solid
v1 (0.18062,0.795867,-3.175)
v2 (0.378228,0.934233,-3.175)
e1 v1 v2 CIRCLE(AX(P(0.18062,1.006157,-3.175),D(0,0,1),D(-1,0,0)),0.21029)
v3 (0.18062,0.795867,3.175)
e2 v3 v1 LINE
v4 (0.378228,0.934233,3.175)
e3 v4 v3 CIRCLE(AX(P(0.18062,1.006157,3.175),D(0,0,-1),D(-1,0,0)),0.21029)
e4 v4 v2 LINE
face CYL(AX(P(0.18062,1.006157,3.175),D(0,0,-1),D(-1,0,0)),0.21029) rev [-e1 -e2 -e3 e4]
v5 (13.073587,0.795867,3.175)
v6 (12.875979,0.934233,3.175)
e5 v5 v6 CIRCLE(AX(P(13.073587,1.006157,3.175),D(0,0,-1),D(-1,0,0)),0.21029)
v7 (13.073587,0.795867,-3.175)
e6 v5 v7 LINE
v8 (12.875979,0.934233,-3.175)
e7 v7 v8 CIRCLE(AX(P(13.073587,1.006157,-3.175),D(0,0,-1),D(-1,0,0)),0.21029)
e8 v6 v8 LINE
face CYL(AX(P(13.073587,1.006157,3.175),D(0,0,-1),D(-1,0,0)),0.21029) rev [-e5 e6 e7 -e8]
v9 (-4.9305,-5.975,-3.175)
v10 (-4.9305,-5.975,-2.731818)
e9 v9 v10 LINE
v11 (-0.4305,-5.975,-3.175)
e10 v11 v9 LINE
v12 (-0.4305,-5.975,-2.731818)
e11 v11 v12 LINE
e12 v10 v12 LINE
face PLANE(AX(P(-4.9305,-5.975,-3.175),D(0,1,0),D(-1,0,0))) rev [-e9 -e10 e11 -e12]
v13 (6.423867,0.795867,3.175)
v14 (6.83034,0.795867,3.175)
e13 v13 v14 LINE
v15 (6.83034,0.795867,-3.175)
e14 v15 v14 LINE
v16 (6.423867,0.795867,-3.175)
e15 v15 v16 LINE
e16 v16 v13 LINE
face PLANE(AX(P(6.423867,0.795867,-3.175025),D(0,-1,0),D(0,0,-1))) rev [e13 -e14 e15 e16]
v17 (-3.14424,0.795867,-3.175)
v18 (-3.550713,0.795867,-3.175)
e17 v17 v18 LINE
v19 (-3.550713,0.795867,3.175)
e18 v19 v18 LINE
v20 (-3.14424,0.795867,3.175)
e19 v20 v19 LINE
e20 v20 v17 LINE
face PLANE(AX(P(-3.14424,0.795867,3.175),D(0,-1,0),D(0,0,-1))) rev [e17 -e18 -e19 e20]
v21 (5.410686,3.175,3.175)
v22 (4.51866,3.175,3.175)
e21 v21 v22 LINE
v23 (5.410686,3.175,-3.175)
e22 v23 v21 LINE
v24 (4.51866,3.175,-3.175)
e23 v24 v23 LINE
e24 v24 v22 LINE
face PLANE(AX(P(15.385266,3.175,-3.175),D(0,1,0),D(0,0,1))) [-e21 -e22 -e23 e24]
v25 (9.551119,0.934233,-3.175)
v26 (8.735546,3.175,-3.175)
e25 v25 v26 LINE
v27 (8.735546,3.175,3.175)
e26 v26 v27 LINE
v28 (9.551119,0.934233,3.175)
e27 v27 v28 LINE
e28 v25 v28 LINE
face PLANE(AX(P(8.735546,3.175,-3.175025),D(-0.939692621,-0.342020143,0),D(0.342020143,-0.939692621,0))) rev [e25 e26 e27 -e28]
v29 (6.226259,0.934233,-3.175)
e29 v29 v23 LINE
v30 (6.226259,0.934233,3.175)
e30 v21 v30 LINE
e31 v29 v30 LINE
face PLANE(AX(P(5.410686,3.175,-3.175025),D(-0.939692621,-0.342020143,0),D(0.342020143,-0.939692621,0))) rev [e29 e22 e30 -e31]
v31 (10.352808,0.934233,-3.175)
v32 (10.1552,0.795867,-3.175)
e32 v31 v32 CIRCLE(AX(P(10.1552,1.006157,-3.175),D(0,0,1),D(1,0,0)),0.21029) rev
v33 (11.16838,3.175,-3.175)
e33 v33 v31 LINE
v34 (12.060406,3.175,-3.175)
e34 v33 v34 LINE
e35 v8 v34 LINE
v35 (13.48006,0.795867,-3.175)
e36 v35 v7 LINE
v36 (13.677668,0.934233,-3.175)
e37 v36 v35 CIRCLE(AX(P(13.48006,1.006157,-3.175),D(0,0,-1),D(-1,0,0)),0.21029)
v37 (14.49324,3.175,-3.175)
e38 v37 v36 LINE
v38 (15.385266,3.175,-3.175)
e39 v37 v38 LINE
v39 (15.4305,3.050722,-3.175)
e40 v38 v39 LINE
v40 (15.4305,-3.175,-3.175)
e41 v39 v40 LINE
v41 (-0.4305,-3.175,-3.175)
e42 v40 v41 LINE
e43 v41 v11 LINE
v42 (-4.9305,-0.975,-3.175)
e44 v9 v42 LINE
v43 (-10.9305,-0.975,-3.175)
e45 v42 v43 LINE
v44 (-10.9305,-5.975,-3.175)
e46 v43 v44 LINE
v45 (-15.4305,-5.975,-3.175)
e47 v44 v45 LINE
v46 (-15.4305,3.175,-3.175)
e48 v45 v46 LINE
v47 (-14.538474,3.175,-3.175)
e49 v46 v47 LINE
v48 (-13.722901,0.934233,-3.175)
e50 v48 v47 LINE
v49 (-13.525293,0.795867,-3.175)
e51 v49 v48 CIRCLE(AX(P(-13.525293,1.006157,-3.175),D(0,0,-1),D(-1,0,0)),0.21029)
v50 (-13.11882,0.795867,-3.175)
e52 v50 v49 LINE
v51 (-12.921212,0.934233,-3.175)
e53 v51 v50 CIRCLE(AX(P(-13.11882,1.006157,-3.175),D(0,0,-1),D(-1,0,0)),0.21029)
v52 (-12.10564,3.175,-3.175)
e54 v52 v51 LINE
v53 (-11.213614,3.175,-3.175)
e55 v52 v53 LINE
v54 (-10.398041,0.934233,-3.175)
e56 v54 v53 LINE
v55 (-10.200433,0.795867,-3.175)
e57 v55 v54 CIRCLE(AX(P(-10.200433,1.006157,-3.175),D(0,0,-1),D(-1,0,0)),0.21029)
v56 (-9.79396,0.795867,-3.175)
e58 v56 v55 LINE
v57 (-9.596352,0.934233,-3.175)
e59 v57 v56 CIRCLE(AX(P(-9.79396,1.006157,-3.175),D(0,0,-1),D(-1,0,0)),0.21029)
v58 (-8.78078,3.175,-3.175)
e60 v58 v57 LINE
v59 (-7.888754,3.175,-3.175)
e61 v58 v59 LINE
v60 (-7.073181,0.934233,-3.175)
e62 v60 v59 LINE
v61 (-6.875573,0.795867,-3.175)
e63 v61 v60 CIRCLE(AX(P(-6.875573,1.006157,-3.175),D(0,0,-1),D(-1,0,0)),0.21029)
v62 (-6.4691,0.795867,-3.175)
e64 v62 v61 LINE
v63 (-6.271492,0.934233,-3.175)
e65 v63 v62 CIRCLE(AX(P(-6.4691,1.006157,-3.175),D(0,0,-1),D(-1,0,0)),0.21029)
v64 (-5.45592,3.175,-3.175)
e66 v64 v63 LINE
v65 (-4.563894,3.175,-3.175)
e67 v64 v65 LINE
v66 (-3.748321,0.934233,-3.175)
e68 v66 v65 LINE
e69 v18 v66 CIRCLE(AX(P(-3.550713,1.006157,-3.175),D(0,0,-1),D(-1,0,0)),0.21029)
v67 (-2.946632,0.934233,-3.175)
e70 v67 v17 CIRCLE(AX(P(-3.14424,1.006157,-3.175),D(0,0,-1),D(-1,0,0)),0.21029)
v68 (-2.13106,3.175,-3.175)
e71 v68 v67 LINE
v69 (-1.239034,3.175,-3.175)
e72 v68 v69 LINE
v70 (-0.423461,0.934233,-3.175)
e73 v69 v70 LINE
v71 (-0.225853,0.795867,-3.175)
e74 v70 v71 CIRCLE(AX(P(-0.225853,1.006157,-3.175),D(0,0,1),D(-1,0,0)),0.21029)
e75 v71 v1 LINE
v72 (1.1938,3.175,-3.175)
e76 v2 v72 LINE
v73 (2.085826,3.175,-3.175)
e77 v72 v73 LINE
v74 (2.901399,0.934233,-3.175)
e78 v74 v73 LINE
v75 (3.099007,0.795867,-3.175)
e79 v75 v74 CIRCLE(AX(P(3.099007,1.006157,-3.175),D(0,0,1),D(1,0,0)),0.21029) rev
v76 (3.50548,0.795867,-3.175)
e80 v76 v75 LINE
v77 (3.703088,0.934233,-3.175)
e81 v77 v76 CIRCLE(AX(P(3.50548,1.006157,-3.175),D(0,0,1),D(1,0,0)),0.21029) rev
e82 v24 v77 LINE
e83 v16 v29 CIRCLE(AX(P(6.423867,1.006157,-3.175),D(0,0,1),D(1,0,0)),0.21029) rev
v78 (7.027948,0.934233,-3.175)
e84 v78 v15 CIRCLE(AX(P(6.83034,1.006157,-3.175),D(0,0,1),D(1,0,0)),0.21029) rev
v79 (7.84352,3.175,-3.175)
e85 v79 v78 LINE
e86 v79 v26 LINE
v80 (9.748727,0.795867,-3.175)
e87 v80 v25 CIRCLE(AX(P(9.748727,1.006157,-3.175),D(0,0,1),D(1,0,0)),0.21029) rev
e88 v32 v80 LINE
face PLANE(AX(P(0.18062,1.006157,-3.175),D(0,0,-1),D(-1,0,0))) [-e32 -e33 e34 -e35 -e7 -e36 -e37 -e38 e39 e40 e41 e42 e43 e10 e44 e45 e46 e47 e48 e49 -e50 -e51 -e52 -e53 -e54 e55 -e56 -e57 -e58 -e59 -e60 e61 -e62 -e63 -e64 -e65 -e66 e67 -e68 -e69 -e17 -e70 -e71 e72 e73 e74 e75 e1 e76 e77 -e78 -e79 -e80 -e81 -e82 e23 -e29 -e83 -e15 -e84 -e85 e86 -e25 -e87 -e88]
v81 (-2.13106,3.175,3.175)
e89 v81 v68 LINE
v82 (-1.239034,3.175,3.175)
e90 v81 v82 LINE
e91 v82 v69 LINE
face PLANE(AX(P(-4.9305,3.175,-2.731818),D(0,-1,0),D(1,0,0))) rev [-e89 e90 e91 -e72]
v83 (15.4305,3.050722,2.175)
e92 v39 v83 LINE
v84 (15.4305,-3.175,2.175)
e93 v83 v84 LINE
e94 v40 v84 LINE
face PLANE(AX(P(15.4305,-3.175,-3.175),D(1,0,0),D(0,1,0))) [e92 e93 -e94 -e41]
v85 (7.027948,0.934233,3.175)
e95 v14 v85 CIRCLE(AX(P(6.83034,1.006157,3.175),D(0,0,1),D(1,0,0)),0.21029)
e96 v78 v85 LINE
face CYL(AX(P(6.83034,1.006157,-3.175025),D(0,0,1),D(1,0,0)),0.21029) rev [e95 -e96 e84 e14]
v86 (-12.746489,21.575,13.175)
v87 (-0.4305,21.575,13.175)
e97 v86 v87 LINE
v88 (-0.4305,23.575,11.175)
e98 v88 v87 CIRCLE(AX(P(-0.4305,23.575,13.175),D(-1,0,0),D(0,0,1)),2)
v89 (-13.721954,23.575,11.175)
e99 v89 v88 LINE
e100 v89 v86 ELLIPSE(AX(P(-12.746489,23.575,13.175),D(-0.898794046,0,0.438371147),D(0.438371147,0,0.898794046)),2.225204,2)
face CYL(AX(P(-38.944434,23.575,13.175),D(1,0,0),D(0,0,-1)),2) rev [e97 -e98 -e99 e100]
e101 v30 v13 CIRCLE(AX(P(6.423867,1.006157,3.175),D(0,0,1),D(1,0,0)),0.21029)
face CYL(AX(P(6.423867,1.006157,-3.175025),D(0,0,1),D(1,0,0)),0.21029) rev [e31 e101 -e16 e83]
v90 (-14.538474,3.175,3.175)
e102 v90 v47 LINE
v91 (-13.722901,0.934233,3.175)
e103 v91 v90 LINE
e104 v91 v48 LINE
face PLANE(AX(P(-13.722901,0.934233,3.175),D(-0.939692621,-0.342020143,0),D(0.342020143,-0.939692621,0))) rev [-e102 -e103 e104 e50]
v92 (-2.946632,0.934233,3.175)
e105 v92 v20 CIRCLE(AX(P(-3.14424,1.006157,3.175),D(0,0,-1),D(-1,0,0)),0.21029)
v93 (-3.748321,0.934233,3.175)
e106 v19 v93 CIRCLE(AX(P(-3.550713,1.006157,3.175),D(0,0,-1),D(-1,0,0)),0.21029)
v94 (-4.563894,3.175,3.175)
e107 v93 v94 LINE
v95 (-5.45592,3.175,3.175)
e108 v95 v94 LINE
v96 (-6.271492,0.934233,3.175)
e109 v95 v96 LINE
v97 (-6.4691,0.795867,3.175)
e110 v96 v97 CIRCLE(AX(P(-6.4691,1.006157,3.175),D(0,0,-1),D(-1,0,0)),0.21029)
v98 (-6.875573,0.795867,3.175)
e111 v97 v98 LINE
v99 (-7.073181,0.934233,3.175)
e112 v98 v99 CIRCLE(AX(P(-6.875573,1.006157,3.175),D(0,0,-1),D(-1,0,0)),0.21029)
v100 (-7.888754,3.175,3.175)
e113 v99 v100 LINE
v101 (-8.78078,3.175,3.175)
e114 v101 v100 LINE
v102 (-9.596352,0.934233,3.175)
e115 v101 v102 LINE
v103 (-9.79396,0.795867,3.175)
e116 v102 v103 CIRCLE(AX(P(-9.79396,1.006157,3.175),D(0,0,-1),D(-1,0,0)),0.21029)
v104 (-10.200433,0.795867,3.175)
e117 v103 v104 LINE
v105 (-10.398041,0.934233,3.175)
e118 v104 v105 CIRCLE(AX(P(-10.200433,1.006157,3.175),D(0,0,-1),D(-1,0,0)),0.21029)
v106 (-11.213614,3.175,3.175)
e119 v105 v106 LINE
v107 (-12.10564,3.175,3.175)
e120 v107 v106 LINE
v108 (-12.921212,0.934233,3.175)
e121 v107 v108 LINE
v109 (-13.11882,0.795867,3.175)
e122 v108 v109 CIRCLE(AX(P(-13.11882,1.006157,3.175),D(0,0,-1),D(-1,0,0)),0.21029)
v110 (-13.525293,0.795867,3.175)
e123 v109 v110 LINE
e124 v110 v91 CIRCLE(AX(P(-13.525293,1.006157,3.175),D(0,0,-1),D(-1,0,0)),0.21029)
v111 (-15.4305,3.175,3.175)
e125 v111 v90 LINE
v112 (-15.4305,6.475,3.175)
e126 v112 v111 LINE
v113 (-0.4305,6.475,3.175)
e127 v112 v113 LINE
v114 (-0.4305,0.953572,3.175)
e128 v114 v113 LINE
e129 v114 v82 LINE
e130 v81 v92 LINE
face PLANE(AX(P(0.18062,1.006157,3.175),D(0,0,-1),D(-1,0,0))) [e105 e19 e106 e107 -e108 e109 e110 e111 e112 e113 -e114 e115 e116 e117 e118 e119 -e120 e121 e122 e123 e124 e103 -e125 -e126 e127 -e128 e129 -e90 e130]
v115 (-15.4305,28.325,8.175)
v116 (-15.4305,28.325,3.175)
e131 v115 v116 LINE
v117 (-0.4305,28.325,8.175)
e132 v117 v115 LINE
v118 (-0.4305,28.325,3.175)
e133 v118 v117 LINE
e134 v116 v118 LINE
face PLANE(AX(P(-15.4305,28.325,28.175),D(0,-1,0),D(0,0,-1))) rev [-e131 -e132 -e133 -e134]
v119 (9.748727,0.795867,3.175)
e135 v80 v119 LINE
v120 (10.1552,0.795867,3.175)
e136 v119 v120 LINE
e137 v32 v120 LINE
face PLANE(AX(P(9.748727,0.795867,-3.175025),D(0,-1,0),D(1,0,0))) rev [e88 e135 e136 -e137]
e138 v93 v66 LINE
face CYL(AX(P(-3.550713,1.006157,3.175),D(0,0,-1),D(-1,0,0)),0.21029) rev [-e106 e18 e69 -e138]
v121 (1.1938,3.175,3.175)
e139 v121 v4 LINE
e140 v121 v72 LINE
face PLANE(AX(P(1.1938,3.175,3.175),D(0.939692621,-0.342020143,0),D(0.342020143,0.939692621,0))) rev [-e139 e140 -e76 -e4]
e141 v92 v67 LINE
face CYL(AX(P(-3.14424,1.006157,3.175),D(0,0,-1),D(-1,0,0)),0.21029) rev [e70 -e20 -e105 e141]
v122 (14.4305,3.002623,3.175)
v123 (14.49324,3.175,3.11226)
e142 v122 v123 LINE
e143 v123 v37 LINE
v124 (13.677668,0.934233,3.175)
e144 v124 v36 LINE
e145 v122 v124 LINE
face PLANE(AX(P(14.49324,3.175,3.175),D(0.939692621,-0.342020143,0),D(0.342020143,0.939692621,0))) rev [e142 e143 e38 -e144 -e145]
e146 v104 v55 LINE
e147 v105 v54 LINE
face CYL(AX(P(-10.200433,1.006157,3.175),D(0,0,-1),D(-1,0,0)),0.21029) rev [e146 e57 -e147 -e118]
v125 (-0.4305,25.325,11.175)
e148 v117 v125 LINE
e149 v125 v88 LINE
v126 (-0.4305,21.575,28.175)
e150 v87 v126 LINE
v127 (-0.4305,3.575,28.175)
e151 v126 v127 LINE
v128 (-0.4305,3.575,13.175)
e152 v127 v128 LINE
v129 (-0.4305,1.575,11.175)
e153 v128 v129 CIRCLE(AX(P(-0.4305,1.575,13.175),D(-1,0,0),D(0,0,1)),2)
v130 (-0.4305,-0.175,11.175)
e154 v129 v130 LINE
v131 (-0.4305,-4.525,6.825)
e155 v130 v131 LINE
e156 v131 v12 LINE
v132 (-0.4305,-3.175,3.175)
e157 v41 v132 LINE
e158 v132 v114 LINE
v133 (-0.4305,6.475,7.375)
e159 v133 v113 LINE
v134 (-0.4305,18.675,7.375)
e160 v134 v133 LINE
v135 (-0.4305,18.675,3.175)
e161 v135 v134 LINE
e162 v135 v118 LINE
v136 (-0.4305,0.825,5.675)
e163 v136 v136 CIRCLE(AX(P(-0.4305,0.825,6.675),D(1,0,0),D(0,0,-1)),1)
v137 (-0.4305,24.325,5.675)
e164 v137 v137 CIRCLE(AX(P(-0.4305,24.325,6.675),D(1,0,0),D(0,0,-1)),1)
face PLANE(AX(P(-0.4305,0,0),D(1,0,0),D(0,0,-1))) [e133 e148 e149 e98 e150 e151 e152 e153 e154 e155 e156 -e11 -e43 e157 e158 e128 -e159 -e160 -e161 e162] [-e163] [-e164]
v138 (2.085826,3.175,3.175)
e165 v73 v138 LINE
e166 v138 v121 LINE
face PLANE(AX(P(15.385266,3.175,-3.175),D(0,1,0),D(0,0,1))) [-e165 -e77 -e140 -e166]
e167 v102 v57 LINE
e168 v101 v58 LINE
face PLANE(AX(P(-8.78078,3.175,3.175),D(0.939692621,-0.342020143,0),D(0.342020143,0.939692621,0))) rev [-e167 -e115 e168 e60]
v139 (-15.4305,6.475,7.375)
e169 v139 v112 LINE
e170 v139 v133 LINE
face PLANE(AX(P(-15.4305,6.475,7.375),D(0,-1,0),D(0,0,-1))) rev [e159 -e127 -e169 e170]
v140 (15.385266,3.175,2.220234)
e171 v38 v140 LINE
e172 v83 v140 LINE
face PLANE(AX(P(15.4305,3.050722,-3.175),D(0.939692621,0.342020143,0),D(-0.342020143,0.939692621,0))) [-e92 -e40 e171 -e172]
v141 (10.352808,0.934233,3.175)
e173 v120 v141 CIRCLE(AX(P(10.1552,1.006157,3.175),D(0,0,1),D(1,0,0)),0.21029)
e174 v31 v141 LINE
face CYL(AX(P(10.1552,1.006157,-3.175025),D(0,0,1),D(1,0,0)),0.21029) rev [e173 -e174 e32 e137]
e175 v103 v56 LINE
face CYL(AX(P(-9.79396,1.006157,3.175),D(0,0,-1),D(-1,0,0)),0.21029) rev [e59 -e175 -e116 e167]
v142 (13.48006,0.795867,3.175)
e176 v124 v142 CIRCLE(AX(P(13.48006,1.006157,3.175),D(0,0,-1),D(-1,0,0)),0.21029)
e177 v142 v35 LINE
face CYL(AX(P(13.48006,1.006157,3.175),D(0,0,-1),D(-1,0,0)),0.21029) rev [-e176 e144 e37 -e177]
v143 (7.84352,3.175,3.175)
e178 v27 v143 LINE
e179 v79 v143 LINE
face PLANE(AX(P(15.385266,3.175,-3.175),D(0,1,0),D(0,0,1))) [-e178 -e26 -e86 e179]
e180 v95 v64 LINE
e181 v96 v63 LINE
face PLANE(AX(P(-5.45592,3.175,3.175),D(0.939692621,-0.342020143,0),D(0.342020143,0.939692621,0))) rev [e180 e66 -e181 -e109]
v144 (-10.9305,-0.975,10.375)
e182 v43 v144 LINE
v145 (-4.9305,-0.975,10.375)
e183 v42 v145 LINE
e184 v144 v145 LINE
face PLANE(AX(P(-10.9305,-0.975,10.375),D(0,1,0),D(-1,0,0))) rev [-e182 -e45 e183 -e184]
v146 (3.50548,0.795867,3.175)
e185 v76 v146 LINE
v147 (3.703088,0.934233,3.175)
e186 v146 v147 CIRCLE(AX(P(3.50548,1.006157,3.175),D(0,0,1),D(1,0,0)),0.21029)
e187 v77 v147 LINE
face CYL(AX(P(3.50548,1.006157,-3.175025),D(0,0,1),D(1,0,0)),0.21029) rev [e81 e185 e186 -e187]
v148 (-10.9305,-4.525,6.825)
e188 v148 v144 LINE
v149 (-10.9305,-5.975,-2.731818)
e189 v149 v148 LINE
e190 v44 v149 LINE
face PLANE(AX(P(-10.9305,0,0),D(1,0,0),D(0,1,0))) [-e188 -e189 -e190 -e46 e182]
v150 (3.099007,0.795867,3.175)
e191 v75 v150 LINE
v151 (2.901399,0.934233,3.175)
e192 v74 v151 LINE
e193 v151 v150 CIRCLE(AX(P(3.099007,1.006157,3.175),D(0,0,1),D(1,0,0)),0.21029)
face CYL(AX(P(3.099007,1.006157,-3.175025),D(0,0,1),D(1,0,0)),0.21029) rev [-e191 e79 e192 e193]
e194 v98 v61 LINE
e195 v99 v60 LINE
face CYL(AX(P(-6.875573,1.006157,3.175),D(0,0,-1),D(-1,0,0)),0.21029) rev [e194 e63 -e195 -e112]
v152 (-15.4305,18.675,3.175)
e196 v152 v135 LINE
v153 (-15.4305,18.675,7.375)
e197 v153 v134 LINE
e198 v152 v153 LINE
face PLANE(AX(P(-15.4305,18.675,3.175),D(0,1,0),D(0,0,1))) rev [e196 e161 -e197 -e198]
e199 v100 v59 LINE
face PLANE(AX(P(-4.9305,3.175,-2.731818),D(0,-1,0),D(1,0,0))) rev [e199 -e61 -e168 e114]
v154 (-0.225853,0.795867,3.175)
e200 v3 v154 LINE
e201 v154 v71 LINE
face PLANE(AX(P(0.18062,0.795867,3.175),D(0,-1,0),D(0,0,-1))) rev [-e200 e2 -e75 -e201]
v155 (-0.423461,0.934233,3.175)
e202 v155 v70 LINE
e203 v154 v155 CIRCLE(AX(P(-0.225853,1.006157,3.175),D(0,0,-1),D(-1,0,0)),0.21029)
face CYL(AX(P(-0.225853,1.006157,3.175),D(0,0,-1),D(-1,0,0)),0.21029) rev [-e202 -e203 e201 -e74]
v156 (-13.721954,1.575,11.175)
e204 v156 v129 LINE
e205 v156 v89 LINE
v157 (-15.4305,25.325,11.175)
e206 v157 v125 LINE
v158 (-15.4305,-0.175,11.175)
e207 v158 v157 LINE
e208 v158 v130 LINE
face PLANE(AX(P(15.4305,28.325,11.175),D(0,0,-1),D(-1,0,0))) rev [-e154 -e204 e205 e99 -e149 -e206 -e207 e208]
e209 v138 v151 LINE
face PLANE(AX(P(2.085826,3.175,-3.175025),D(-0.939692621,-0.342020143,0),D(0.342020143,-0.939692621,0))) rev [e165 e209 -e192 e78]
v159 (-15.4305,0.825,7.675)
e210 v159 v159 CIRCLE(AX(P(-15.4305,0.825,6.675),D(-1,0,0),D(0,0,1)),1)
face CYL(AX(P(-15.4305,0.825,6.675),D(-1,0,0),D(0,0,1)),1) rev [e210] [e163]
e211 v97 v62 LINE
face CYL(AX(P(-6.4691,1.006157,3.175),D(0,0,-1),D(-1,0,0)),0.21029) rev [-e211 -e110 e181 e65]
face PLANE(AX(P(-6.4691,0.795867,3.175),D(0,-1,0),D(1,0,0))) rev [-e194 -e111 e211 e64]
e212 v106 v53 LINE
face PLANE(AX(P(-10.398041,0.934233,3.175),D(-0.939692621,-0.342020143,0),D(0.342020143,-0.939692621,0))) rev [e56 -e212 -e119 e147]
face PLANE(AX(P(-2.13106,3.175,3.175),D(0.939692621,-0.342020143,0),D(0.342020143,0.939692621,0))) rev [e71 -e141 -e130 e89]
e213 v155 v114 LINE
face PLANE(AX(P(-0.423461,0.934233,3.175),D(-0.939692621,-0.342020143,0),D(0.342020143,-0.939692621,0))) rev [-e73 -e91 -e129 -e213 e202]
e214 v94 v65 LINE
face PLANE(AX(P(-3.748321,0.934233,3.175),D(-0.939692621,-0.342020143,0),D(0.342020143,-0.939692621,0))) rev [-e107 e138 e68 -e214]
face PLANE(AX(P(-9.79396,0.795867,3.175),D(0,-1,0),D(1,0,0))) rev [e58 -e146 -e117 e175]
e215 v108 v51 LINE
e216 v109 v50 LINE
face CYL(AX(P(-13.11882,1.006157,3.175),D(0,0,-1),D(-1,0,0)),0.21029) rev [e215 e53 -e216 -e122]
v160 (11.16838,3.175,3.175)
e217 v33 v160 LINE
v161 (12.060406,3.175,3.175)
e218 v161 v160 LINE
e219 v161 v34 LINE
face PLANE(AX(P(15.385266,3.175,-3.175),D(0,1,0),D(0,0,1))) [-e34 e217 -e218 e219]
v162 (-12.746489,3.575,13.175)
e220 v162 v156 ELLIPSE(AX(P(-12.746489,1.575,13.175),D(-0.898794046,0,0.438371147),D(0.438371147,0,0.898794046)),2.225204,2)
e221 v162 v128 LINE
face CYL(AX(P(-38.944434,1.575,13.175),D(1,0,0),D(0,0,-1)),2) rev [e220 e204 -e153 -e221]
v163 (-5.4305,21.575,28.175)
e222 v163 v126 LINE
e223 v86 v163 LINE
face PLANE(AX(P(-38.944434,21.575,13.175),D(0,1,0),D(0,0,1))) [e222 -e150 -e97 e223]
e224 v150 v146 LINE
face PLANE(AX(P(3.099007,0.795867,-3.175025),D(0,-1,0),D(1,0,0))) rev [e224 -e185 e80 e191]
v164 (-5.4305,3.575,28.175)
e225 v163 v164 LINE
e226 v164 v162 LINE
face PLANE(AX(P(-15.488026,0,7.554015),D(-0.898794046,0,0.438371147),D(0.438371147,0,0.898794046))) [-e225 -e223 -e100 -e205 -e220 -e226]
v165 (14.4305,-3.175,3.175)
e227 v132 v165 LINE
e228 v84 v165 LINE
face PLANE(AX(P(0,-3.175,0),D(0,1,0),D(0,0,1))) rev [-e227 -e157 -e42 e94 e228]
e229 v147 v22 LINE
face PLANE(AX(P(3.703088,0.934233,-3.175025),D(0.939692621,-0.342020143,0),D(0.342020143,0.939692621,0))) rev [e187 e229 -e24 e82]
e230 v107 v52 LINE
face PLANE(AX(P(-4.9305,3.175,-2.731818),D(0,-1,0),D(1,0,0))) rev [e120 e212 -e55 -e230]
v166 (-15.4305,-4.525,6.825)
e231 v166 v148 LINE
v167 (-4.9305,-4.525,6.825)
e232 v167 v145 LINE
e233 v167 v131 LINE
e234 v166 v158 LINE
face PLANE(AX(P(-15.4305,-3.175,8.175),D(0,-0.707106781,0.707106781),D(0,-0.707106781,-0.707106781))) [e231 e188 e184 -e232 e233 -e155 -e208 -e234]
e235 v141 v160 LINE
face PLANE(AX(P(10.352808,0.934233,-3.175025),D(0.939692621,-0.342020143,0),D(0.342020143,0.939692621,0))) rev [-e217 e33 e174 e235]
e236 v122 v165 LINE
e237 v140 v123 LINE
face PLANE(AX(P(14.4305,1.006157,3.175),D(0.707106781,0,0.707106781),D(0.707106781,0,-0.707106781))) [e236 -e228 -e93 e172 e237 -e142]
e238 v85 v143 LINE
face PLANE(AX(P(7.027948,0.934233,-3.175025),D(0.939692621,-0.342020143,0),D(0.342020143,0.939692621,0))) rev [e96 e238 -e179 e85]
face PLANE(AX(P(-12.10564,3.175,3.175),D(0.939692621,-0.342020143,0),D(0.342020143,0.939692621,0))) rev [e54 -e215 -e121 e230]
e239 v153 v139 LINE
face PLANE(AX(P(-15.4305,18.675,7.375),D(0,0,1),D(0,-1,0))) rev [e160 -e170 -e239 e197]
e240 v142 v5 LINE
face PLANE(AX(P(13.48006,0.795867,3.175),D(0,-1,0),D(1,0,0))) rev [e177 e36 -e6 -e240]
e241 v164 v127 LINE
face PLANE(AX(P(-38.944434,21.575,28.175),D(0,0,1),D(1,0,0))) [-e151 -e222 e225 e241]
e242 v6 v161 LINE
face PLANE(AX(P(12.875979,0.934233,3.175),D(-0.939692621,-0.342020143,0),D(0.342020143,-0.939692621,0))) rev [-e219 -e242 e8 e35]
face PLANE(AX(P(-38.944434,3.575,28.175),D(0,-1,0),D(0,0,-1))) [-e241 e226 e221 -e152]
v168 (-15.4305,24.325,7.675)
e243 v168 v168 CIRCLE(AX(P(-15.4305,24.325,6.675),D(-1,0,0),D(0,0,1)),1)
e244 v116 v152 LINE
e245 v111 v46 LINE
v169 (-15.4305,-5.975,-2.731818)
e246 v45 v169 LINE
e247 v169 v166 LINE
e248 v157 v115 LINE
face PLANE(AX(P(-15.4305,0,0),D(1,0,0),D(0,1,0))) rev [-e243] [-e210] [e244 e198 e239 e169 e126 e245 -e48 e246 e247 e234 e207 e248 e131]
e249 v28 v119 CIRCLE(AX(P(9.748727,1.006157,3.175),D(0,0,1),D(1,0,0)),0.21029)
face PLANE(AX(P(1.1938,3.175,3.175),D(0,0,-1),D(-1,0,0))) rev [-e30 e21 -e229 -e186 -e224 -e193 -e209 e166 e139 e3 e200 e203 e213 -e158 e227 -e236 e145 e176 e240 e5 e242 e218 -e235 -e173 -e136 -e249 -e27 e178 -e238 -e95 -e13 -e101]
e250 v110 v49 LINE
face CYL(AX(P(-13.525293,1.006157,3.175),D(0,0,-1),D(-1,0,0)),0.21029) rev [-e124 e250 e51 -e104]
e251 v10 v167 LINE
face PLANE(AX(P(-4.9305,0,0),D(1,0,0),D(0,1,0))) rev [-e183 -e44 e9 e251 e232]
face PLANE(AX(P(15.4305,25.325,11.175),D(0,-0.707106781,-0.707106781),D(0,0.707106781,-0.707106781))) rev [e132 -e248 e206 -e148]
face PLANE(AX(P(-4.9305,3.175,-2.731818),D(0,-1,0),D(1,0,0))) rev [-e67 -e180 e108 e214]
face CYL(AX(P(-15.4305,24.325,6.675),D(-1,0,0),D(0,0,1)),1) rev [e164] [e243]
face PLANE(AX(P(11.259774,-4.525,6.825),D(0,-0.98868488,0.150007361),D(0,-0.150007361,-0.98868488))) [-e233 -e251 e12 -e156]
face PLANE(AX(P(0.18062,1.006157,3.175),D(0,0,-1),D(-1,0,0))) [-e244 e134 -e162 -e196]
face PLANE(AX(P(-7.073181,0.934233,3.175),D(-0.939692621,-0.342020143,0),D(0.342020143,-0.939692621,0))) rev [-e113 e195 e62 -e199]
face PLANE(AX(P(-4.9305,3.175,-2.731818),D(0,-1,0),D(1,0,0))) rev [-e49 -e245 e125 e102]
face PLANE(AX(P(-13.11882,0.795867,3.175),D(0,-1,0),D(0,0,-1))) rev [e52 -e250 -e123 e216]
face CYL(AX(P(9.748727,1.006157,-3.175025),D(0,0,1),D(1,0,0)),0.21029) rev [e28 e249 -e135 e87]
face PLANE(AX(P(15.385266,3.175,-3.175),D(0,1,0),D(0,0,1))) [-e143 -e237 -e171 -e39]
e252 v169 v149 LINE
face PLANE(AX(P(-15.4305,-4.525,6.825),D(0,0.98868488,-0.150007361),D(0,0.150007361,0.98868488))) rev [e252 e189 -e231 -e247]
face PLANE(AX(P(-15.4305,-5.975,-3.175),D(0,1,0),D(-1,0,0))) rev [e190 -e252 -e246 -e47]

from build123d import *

# Parameters (mm, degrees)
BOSS_EXTRUDE1_START       = -15.249880268
BOSS_EXTRUDE1_DEPTH       = 15.861
BOSS_EXTRUDE1_START_2     = -4
BOSS_EXTRUDE1_2_DEPTH     = 16
BOSS_EXTRUDE1_START_3     = 3.175
BOSS_EXTRUDE1_3_DEPTH     = 8.825
BOSS_EXTRUDE1_START_4     = -2.731818182
BOSS_EXTRUDE1_4_DEPTH     = 4.906818182
BOSS_EXTRUDE1_START_5     = -5.890415993
BOSS_EXTRUDE1_5_DEPTH     = 9.065415993
BOSS_EXTRUDE1_START_6     = -5.975
BOSS_EXTRUDE1_6_DEPTH     = 8.072424826
CUT_EXTRUDE1_DEPTH        = 0.896206897
BOSS_EXTRUDE2_DEPTH       = 0.896206897
BOSS_EXTRUDE3_DEPTH       = 0.808533663
CUT_EXTRUDE2_DEPTH        = 5.906818182
CUT_EXTRUDE3_DEPTH        = 2.8
CUT_EXTRUDE4_DEPTH        = 13.2367
BOSS_EXTRUDE4_DEPTH       = 3.691466337
CUT_EXTRUDE5_DEPTH        = 1.013180268
BOSS_EXTRUDE5_DEPTH       = 6
BOSS_EXTRUDE6_DEPTH       = 4.5
CUT_EXTRUDE6_DEPTH        = 0.611119732
BOSS_EXTRUDE7_START       = 0.443181818
BOSS_EXTRUDE7_DEPTH       = 0.443181818
BOSS_EXTRUDE8_REACH       = 36.333
CUT_EXTRUDE7_DEPTH        = 6.35
CUT_EXTRUDE8_DEPTH        = 6.35
CUT_EXTRUDE9_DEPTH        = 6.35
CUT_EXTRUDE10_DEPTH       = 6.35
CUT_EXTRUDE11_DEPTH       = 6.35
CUT_EXTRUDE12_DEPTH       = 41.809385627
CUT_EXTRUDE13_DEPTH       = 41.809385627
CUT_EXTRUDE14_DEPTH       = 41.809385627
SKETCH24_W                = 4.2
SKETCH24_H                = 12.2
CUT_EXTRUDE15_DEPTH       = 43.984969129
F_3_CLEARANCE_HOLE1_D     = 2
F_3_CLEARANCE_HOLE1_DEPTH = 30.861103078


with BuildPart() as part:
    # Boss-Extrude1: read off the stored shape, not the designer's step
    # Boss-Extrude1 outline → Boss-Extrude1 (new body)
    with BuildSketch(Plane.ZY.offset(-0.180619732).offset(BOSS_EXTRUDE1_START)):
        Polygon((-2.731818182, -5.975), (6.825, -4.525), (11.175, -0.175), (11.175, 25.325), (8.175, 28.325), (-2.731818182, 28.325), (-2.731818182, 3.175), align=None)
    extrude(amount=BOSS_EXTRUDE1_DEPTH)

    # Boss-Extrude1 2 outline → Boss-Extrude1 2 (cut)
    with BuildSketch(Plane.XY.offset(BOSS_EXTRUDE1_START_2)):
        Polygon((14.4305, 3.175), (15.385266337, 3.175), (15.4305, 3.050721534), (15.4305, 28.325), (14.4305, 28.325), align=None)
    extrude(amount=BOSS_EXTRUDE1_2_DEPTH, mode=Mode.SUBTRACT)

    # Boss-Extrude1 3 outline → Boss-Extrude1 3 (cut)
    with BuildSketch(Plane.XY.offset(BOSS_EXTRUDE1_START_3)):
        Polygon((15.4305, 3.050721534), (15.385266337, 3.175), (14.4305, 3.175), (14.4305, -5.975), (15.4305, -5.975), align=None)
    extrude(amount=BOSS_EXTRUDE1_3_DEPTH, mode=Mode.SUBTRACT)

    # Boss-Extrude1 4 outline → Boss-Extrude1 4 (add)
    with BuildSketch(Plane.XY.offset(BOSS_EXTRUDE1_START_4)):
        Polygon((15.4305, 3.050721534), (15.385266337, 3.175), (14.4305, 3.175), (14.4305, -5.975), (15.4305, -5.975), align=None)
    extrude(amount=BOSS_EXTRUDE1_4_DEPTH)

    # Boss-Extrude1 5 outline → Boss-Extrude1 5 (cut)
    with BuildSketch(Plane(origin=(0, 0, 0), x_dir=(1, 0, 0), z_dir=(0, 1, 0)).offset(BOSS_EXTRUDE1_START_5)):
        Polygon((15.4305, -2.175), (14.4305, -3.175), (15.4305, -3.175), align=None)
    extrude(amount=BOSS_EXTRUDE1_5_DEPTH, mode=Mode.SUBTRACT)

    # Boss-Extrude1 6 outline → Boss-Extrude1 6 (add)
    with BuildSketch(Plane(origin=(0, 0, 0), x_dir=(1, 0, 0), z_dir=(0, 1, 0)).offset(BOSS_EXTRUDE1_START_6)):
        Polygon((14.4305, -2.175), (14.4305, -3.175), (15.4305, -2.175), align=None)
    extrude(amount=BOSS_EXTRUDE1_6_DEPTH)

    # Sketch2 → Cut-Extrude1 (cut)
    with BuildSketch(Plane.XZ.offset(5.975)):
        Polygon((15.4305, 2.175), (14.4305, 3.175), (14.4305, -2.731818182), (15.4305, -2.731818182), align=None)
    extrude(amount=-CUT_EXTRUDE1_DEPTH, mode=Mode.SUBTRACT)

    # Sketch3 → Boss-Extrude2 (add)
    with BuildSketch(Plane.XZ.offset(5.078793103)):
        Polygon((14.4305, 3.175), (15.4305, 2.175), (15.4305, -2.731818182), (14.4305, -2.731818182), align=None)
    extrude(amount=BOSS_EXTRUDE2_DEPTH)

    # Sketch4 → Boss-Extrude3 (add)
    with BuildSketch(Plane.ZY.offset(0.4305)):
        Polygon((-2.731818182, -5.975), (-2.731818182, 28.325), (8.175, 28.325), (11.175, 25.325), (11.175, -0.175), (6.825, -4.525), align=None)
    extrude(amount=BOSS_EXTRUDE3_DEPTH)

    # Sketch5 → Cut-Extrude2 (cut)
    with BuildSketch(Plane(origin=(0, 0, -2.731818182), x_dir=(-1, 0, 0), z_dir=(0, 0, -1))):
        with BuildLine():
            Line((1.239033663, 3.175), (1.239033663, 28.325))
            Line((1.239033663, 28.325), (-14.4305, 28.325))
            Line((-14.4305, 28.325), (-14.4305, 3.175))
            Line((-14.4305, 3.175), (-1.1938, 3.175))
            Line((-1.1938, 3.175), (-0.37822757, 0.934233164))
            ThreePointArc((-0.37822757, 0.934233164), (-0.301237046, 0.83389716), (-0.180619732, 0.795866667))
            Line((-0.180619732, 0.795866667), (0.225853395, 0.795866667))
            ThreePointArc((0.225853395, 0.795866667), (0.346470708, 0.83389716), (0.423461232, 0.934233164))
            Line((0.423461232, 0.934233164), (1.239033663, 3.175))
        make_face()
    extrude(amount=-CUT_EXTRUDE2_DEPTH, mode=Mode.SUBTRACT)

    # Sketch6 → Cut-Extrude3 (cut)
    with BuildSketch(Plane.XZ.offset(5.975)):
        Polygon((15.4305, 2.175), (14.4305, 3.175), (14.4305, -2.731818182), (15.4305, -2.731818182), align=None)
    extrude(amount=-CUT_EXTRUDE3_DEPTH, mode=Mode.SUBTRACT)

    # Sketch7 → Cut-Extrude4 (cut)
    with BuildSketch(Plane(origin=(14.4305, 0, 0), x_dir=(0, 0, -1), z_dir=(1, 0, 0))):
        Polygon((2.731818182, -5.975), (2.731818182, -3.175), (-3.175, -3.175), (-3.175, 3.175), (-3.175, 28.325), (-8.175, 28.325), (-11.175, 25.325), (-11.175, -0.175), (-6.825, -4.525), align=None)
    extrude(amount=-CUT_EXTRUDE4_DEPTH, mode=Mode.SUBTRACT)

    # Sketch8 → Boss-Extrude4 (add)
    with BuildSketch(Plane.ZY.offset(1.239033663)):
        Polygon((-2.731818182, -5.975), (-2.731818182, 3.175), (3.175, 3.175), (3.175, 28.325), (8.175, 28.325), (11.175, 25.325), (11.175, -0.175), (6.825, -4.525), align=None)
    extrude(amount=BOSS_EXTRUDE4_DEPTH)

    # Sketch9 → Cut-Extrude5 (cut)
    with BuildSketch(Plane(origin=(1.1938, 0, 0), x_dir=(0, 0, -1), z_dir=(1, 0, 0))):
        Polygon((2.731818182, -5.975), (2.731818182, -3.175), (-3.175, -3.175), (-3.175, 0.795866667), (-3.175, 28.325), (-8.175, 28.325), (-11.175, 25.325), (-11.175, -0.175), (-6.825, -4.525), align=None)
    extrude(amount=-CUT_EXTRUDE5_DEPTH, mode=Mode.SUBTRACT)

    # Sketch10 → Boss-Extrude5 (add)
    with BuildSketch(Plane.ZY.offset(4.9305)):
        Polygon((10.375, -0.975), (-2.731818182, -0.975), (-2.731818182, 3.175), (3.175, 3.175), (3.175, 28.325), (8.175, 28.325), (11.175, 25.325), (11.175, -0.175), align=None)
    extrude(amount=BOSS_EXTRUDE5_DEPTH)

    # Sketch11 → Boss-Extrude6 (add)
    with BuildSketch(Plane.ZY.offset(10.9305)):
        Polygon((-2.731818182, 3.175), (3.175, 3.175), (3.175, 28.325), (8.175, 28.325), (11.175, 25.325), (11.175, -0.175), (6.825, -4.525), (-2.731818182, -5.975), align=None)
    extrude(amount=BOSS_EXTRUDE6_DEPTH)

    # Sketch12 → Cut-Extrude6 (cut)
    with BuildSketch(Plane(origin=(0.180619732, 0, 0), x_dir=(0, 0, -1), z_dir=(1, 0, 0))):
        Polygon((2.731818182, -5.975), (2.731818182, -3.175), (-3.175, -3.175), (-3.175, 0.953572019), (-3.175, 28.325), (-8.175, 28.325), (-11.175, 25.325), (-11.175, -0.175), (-6.825, -4.525), align=None)
    extrude(amount=-CUT_EXTRUDE6_DEPTH, mode=Mode.SUBTRACT)

    # Sketch13 → Boss-Extrude7 (add)
    with BuildSketch(Plane(origin=(0, 0, -2.731818182), x_dir=(-1, 0, 0), z_dir=(0, 0, -1)).offset(BOSS_EXTRUDE7_START)):
        with BuildLine():
            Line((-1.1938, 3.175), (-0.37822757, 0.934233164))
            ThreePointArc((-0.37822757, 0.934233164), (-0.301237046, 0.83389716), (-0.180619732, 0.795866667))
            Line((-0.180619732, 0.795866667), (0.225853395, 0.795866667))
            ThreePointArc((0.225853395, 0.795866667), (0.346470708, 0.83389716), (0.423461232, 0.934233164))
            Line((0.423461232, 0.934233164), (1.239033663, 3.175))
            Line((1.239033663, 3.175), (15.4305, 3.175))
            Line((15.4305, 3.175), (15.4305, -5.975))
            Line((15.4305, -5.975), (10.9305, -5.975))
            Line((10.9305, -5.975), (10.9305, -0.975))
            Line((10.9305, -0.975), (4.9305, -0.975))
            Line((4.9305, -0.975), (4.9305, -5.975))
            Line((4.9305, -5.975), (0.4305, -5.975))
            Line((0.4305, -5.975), (0.4305, -3.175))
            Line((0.4305, -3.175), (-15.4305, -3.175))
            Line((-15.4305, -3.175), (-15.4305, 3.050721534))
            Line((-15.4305, 3.050721534), (-15.385266337, 3.175))
            Line((-15.385266337, 3.175), (-1.1938, 3.175))
        make_face()
    extrude(amount=-BOSS_EXTRUDE7_DEPTH)

    # Boss-Extrude8: up to this plane
    boss_extrude8_end = Plane(origin=(-15.488026312, 0, 7.554015165), z_dir=(-0.8987940462991697, 0, 0.438371146789072))
    # Sketch15 → Boss-Extrude8 (add, up to the surface)
    with BuildSketch(Plane(origin=(-0.4305, 0, 0), x_dir=(0, 0, -1), z_dir=(1, 0, 0)), mode=Mode.PRIVATE) as boss_extrude8_sk1:
        with BuildLine():
            Line((-11.175, 1.575), (-11.175, 23.575))
            ThreePointArc((-11.175, 23.575), (-11.760786438, 22.160786438), (-13.175, 21.575))
            Line((-13.175, 21.575), (-28.175, 21.575))
            Line((-28.175, 21.575), (-28.175, 3.575))
            Line((-28.175, 3.575), (-13.175, 3.575))
            ThreePointArc((-13.175, 3.575), (-11.760786438, 2.989213562), (-11.175, 1.575))
        make_face()
    boss_extrude8_tool1 = split(extrude(boss_extrude8_sk1.sketch, amount=-BOSS_EXTRUDE8_REACH, mode=Mode.PRIVATE), bisect_by=boss_extrude8_end, keep=Keep.BOTH, mode=Mode.PRIVATE)
    add(boss_extrude8_tool1.solids().sort_by_distance((-0.4305, 12.575, 19.630069))[0])

    # Sketch16 → Cut-Extrude7 (cut)
    with BuildSketch(Plane(origin=(0, 0, -3.175), x_dir=(-1, 0, 0), z_dir=(0, 0, -1))):
        with BuildLine():
            Line((3.748321232, 0.934233164), (4.563893663, 3.175))
            Line((4.563893663, 3.175), (2.13106, 3.175))
            Line((2.13106, 3.175), (2.94663243, 0.934233164))
            ThreePointArc((2.94663243, 0.934233164), (3.023622954, 0.83389716), (3.144240268, 0.795866667))
            Line((3.144240268, 0.795866667), (3.550713395, 0.795866667))
            ThreePointArc((3.550713395, 0.795866667), (3.671330708, 0.83389716), (3.748321232, 0.934233164))
        make_face()
    extrude(amount=-CUT_EXTRUDE7_DEPTH, mode=Mode.SUBTRACT)

    # Sketch17 → Cut-Extrude8 (cut)
    with BuildSketch(Plane(origin=(0, 0, -3.175), x_dir=(-1, 0, 0), z_dir=(0, 0, -1))):
        with BuildLine():
            Line((7.073181232, 0.934233164), (7.888753663, 3.175))
            Line((7.888753663, 3.175), (5.45592, 3.175))
            Line((5.45592, 3.175), (6.27149243, 0.934233164))
            ThreePointArc((6.27149243, 0.934233164), (6.348482954, 0.83389716), (6.469100268, 0.795866667))
            Line((6.469100268, 0.795866667), (6.875573395, 0.795866667))
            ThreePointArc((6.875573395, 0.795866667), (6.996190708, 0.83389716), (7.073181232, 0.934233164))
        make_face()
    extrude(amount=-CUT_EXTRUDE8_DEPTH, mode=Mode.SUBTRACT)

    # Sketch18 → Cut-Extrude9 (cut)
    with BuildSketch(Plane(origin=(0, 0, -3.175), x_dir=(-1, 0, 0), z_dir=(0, 0, -1))):
        with BuildLine():
            Line((10.398041232, 0.934233164), (11.213613663, 3.175))
            Line((11.213613663, 3.175), (8.78078, 3.175))
            Line((8.78078, 3.175), (9.59635243, 0.934233164))
            ThreePointArc((9.59635243, 0.934233164), (9.673342954, 0.83389716), (9.793960268, 0.795866667))
            Line((9.793960268, 0.795866667), (10.200433395, 0.795866667))
            ThreePointArc((10.200433395, 0.795866667), (10.321050708, 0.83389716), (10.398041232, 0.934233164))
        make_face()
    extrude(amount=-CUT_EXTRUDE9_DEPTH, mode=Mode.SUBTRACT)

    # Sketch19 → Cut-Extrude10 (cut)
    with BuildSketch(Plane(origin=(0, 0, -3.175), x_dir=(-1, 0, 0), z_dir=(0, 0, -1))):
        with BuildLine():
            Line((13.722901232, 0.934233164), (14.538473663, 3.175))
            Line((14.538473663, 3.175), (12.10564, 3.175))
            Line((12.10564, 3.175), (12.92121243, 0.934233164))
            ThreePointArc((12.92121243, 0.934233164), (12.998202954, 0.83389716), (13.118820268, 0.795866667))
            Line((13.118820268, 0.795866667), (13.525293395, 0.795866667))
            ThreePointArc((13.525293395, 0.795866667), (13.645910708, 0.83389716), (13.722901232, 0.934233164))
        make_face()
    extrude(amount=-CUT_EXTRUDE10_DEPTH, mode=Mode.SUBTRACT)

    # Sketch20 → Cut-Extrude11 (cut)
    with BuildSketch(Plane(origin=(0, 0, -3.175), x_dir=(-1, 0, 0), z_dir=(0, 0, -1))):
        with BuildLine():
            Line((-12.060406337, 3.175), (-14.49324, 3.175))
            Line((-14.49324, 3.175), (-13.67766757, 0.934233164))
            ThreePointArc((-13.67766757, 0.934233164), (-13.600677046, 0.83389716), (-13.480059732, 0.795866667))
            Line((-13.480059732, 0.795866667), (-13.073586605, 0.795866667))
            ThreePointArc((-13.073586605, 0.795866667), (-12.952969292, 0.83389716), (-12.875978768, 0.934233164))
            Line((-12.875978768, 0.934233164), (-12.060406337, 3.175))
        make_face()
    extrude(amount=-CUT_EXTRUDE11_DEPTH, mode=Mode.SUBTRACT)

    # Sketch21 → Cut-Extrude12 (cut, through all)
    with BuildSketch(Plane.XY.offset(3.175)):
        with BuildLine():
            Line((2.085826337, 3.175), (2.901398768, 0.934233164))
            ThreePointArc((2.901398768, 0.934233164), (2.978389292, 0.83389716), (3.099006605, 0.795866667))
            Line((3.099006605, 0.795866667), (3.505479732, 0.795866667))
            ThreePointArc((3.505479732, 0.795866667), (3.626097046, 0.83389716), (3.70308757, 0.934233164))
            Line((3.70308757, 0.934233164), (4.51866, 3.175))
            Line((4.51866, 3.175), (2.085826337, 3.175))
        make_face()
    extrude(amount=-CUT_EXTRUDE12_DEPTH, mode=Mode.SUBTRACT)

    # Sketch22 → Cut-Extrude13 (cut, through all)
    with BuildSketch(Plane.XY.offset(3.175)):
        with BuildLine():
            Line((5.410686337, 3.175), (6.226258768, 0.934233164))
            ThreePointArc((6.226258768, 0.934233164), (6.303249292, 0.83389716), (6.423866605, 0.795866667))
            Line((6.423866605, 0.795866667), (6.830339732, 0.795866667))
            ThreePointArc((6.830339732, 0.795866667), (6.950957046, 0.83389716), (7.02794757, 0.934233164))
            Line((7.02794757, 0.934233164), (7.84352, 3.175))
            Line((7.84352, 3.175), (5.410686337, 3.175))
        make_face()
    extrude(amount=-CUT_EXTRUDE13_DEPTH, mode=Mode.SUBTRACT)

    # Sketch23 → Cut-Extrude14 (cut, through all)
    with BuildSketch(Plane.XY.offset(3.175)):
        with BuildLine():
            Line((8.735546337, 3.175), (9.551118768, 0.934233164))
            ThreePointArc((9.551118768, 0.934233164), (9.628109292, 0.83389716), (9.748726605, 0.795866667))
            Line((9.748726605, 0.795866667), (10.155199732, 0.795866667))
            ThreePointArc((10.155199732, 0.795866667), (10.275817046, 0.83389716), (10.35280757, 0.934233164))
            Line((10.35280757, 0.934233164), (11.16838, 3.175))
            Line((11.16838, 3.175), (8.735546337, 3.175))
        make_face()
    extrude(amount=-CUT_EXTRUDE14_DEPTH, mode=Mode.SUBTRACT)

    # Sketch24 → Cut-Extrude15 (cut, through all)
    with BuildSketch(Plane(origin=(-0.4305, 0, 0), x_dir=(0, 0, -1), z_dir=(1, 0, 0))):
        with Locations((-5.275, 12.575)):
            Rectangle(SKETCH24_W, SKETCH24_H)
    extrude(amount=-CUT_EXTRUDE15_DEPTH, mode=Mode.SUBTRACT)

    # #3 Clearance Hole1
    with Locations(Plane.ZY.offset(15.4305)):
        with Locations((6.675, 24.325), (6.675, 0.825)):
            Hole(F_3_CLEARANCE_HOLE1_D / 2, depth=F_3_CLEARANCE_HOLE1_DEPTH)


solid = part.part
